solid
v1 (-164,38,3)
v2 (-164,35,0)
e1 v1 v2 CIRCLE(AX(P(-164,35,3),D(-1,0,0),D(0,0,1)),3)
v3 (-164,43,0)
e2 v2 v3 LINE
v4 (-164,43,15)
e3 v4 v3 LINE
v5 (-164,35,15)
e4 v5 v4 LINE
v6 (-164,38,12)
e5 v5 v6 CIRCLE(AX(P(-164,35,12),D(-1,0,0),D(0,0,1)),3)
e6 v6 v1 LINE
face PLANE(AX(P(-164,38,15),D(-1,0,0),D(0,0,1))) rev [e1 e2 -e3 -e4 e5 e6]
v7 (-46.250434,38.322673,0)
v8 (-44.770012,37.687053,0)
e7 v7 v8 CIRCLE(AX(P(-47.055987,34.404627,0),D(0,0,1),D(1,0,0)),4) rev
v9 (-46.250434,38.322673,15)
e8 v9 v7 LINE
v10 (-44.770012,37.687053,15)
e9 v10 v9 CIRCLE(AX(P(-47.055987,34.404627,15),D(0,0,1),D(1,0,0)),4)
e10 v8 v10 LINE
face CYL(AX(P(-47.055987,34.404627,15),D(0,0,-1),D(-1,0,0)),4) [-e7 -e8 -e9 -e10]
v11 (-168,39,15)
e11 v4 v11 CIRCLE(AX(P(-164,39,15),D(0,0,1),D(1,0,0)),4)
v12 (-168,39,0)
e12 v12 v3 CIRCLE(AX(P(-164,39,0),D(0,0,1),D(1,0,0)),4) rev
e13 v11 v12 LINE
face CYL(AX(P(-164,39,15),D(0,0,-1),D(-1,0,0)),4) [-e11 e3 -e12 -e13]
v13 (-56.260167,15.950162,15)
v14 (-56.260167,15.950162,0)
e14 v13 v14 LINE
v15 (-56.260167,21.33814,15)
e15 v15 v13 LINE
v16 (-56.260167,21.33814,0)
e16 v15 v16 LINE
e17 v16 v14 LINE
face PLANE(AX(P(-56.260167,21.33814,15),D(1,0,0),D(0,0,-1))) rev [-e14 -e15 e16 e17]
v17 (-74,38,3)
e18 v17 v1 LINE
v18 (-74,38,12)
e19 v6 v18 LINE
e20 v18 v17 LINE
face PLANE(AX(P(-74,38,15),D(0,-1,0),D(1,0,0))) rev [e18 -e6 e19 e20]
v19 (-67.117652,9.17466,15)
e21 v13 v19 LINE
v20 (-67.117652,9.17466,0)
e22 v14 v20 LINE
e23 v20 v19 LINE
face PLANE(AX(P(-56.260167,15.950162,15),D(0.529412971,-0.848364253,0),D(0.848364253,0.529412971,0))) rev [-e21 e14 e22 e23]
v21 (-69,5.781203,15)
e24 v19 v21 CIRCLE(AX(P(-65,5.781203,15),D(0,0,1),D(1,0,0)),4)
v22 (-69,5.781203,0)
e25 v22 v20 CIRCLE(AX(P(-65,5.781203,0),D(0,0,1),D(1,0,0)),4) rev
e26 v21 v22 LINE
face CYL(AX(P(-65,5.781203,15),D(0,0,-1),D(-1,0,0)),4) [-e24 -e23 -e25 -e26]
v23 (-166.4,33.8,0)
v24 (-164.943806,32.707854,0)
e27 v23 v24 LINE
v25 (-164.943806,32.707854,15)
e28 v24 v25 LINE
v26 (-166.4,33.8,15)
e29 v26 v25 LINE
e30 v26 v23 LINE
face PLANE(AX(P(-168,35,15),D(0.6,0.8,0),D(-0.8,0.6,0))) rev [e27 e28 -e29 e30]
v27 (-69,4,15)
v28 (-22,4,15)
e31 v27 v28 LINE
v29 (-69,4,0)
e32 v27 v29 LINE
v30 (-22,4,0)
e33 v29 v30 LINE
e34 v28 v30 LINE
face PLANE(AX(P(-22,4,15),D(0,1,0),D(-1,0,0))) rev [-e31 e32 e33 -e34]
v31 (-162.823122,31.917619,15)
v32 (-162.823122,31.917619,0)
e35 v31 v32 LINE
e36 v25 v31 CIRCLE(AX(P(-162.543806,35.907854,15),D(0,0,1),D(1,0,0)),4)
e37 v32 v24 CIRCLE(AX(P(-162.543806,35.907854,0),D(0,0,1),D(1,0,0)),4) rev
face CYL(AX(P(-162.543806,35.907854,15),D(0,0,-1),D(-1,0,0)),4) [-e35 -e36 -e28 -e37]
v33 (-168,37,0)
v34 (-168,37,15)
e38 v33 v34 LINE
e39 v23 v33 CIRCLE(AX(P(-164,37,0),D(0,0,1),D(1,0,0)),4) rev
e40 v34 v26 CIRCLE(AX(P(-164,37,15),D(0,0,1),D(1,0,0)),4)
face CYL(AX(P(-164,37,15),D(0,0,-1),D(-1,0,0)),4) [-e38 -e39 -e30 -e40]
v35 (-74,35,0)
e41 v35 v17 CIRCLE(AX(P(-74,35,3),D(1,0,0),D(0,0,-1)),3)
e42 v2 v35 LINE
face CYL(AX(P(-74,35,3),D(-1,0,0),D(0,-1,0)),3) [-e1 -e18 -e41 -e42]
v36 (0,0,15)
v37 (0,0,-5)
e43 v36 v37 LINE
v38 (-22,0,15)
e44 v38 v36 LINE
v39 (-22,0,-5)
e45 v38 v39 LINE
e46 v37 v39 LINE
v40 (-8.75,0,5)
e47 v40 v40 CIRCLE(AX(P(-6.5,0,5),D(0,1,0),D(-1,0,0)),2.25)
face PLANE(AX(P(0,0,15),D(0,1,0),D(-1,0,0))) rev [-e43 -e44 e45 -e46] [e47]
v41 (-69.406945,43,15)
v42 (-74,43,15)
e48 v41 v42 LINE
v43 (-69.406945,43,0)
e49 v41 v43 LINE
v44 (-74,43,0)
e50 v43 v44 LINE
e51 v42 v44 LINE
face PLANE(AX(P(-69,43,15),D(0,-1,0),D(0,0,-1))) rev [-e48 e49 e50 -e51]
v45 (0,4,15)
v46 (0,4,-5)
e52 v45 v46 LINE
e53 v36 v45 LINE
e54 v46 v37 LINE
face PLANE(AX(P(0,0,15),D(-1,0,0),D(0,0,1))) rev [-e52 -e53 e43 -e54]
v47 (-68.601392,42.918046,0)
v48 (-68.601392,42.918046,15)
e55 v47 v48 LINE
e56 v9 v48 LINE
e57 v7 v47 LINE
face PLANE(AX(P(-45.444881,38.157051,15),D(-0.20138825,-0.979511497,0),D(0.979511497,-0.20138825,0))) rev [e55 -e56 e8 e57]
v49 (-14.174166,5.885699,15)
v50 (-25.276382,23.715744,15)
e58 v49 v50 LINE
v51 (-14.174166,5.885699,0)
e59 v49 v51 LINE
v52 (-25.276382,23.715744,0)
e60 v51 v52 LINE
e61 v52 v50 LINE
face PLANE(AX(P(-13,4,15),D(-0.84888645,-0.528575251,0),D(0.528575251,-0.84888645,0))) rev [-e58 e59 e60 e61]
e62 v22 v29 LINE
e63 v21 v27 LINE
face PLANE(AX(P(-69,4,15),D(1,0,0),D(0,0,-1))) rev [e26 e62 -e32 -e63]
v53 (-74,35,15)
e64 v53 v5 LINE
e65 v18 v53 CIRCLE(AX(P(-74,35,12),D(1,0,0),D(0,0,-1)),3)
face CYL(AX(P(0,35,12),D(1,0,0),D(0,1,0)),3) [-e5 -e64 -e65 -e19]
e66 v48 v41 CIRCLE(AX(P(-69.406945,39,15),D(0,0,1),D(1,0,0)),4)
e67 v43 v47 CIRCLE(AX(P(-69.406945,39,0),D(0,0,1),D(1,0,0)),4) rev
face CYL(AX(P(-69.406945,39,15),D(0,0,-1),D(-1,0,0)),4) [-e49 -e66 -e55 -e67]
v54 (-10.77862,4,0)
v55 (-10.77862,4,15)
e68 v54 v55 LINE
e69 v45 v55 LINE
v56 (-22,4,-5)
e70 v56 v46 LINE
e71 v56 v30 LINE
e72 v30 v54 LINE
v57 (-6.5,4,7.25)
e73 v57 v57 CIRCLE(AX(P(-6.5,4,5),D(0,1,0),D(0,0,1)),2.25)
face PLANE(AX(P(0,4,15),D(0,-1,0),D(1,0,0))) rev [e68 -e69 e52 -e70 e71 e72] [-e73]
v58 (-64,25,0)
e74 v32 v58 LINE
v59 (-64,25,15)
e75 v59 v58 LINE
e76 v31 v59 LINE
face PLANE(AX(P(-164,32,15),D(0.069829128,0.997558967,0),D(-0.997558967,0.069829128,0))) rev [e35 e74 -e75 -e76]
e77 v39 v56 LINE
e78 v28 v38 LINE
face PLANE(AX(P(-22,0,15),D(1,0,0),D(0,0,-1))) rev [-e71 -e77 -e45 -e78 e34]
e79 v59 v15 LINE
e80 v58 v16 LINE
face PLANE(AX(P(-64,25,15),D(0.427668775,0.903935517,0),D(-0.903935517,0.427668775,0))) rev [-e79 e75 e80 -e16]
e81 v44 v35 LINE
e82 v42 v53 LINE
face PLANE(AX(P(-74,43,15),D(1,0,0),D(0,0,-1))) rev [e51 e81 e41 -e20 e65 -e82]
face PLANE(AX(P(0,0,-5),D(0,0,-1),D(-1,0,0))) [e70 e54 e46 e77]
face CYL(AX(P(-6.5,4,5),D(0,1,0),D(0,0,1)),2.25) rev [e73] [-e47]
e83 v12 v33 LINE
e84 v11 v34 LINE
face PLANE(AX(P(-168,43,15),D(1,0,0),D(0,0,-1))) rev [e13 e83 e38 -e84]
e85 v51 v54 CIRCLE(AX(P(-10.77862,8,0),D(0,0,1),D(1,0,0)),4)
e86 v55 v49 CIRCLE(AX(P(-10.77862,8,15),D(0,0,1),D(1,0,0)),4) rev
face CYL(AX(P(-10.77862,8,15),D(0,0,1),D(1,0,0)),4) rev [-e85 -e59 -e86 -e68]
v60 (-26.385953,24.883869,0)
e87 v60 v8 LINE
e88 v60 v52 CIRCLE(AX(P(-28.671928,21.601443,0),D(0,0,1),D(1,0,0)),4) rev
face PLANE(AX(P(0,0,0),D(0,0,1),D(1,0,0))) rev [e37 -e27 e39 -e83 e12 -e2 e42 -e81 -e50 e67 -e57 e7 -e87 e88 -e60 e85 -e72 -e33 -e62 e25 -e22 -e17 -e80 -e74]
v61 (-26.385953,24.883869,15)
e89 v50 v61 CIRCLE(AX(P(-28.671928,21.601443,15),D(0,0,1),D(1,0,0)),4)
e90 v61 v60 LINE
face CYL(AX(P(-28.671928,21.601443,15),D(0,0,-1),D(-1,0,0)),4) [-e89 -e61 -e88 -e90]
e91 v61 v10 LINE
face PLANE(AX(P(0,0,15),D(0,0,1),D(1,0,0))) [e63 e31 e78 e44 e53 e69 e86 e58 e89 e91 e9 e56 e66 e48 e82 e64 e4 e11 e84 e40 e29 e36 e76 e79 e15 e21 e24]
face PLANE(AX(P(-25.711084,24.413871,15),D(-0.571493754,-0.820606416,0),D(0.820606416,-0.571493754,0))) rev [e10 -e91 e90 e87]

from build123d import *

# Parameters (mm, degrees)
BOSS_EXTRU_1_DEPTH   = 15
CONG_1_R             = 3
CONG_2_R             = 4
ESQUISSE2_W          = 22
ESQUISSE2_H          = 4
BOSS_EXTRU_2_DEPTH   = 5
D_GAGEMENT_M41_D     = 4.5
D_GAGEMENT_M41_DEPTH = 16


with BuildPart() as part:
    # Esquisse1 → Boss.-Extru.1 (new body)
    with BuildSketch(Plane.XY):
        Polygon((0, 0), (-22, 0), (-22, 4), (-69, 4), (-69, 8), (-56.26016699, 15.95016153), (-56.26016699, 21.33814045), (-64, 25), (-164, 32), (-168, 35), (-168, 43), (-164, 43), (-164, 38), (-74, 38), (-74, 43), (-69, 43), (-45.444881322, 38.157051099), (-25.711083844, 24.413870713), (-13, 4), (0, 4), align=None)
    extrude(amount=BOSS_EXTRU_1_DEPTH)

    # Congé1
    cong_1_edges = [part.edges().sort_by_distance(p)[0] for p in [
        (-119, 38, 0),
        (-119, 38, 15),
    ]]
    fillet(cong_1_edges, radius=CONG_1_R)

    # Congé2
    cong_2_edges = [part.edges().sort_by_distance(p)[0] for p in [
        (-69, 8, 7.5),
        (-164, 32, 7.5),
        (-168, 35, 7.5),
        (-168, 43, 7.5),
        (-69, 43, 7.5),
        (-45.444881322, 38.157051099, 7.5),
        (-25.711083844, 24.413870713, 7.5),
        (-13, 4, 7.5),
    ]]
    fillet(cong_2_edges, radius=CONG_2_R - 0.0001)  # a hair under: the kernel refuses the full size

    # Esquisse2 → Boss.-Extru.2 (add)
    with BuildSketch(Plane(origin=(0, 0, 0), x_dir=(-1, 0, 0), z_dir=(0, 0, -1))):
        with Locations((11, 2)):
            Rectangle(ESQUISSE2_W, ESQUISSE2_H)
    extrude(amount=BOSS_EXTRU_2_DEPTH)

    # Dégagement M41
    with Locations(Plane(origin=(0, 4, 0), x_dir=(1, 0, 0), z_dir=(0, 1, 0))):
        with Locations((-6.5, -5)):
            Hole(D_GAGEMENT_M41_D / 2, depth=D_GAGEMENT_M41_DEPTH)


solid = part.part
